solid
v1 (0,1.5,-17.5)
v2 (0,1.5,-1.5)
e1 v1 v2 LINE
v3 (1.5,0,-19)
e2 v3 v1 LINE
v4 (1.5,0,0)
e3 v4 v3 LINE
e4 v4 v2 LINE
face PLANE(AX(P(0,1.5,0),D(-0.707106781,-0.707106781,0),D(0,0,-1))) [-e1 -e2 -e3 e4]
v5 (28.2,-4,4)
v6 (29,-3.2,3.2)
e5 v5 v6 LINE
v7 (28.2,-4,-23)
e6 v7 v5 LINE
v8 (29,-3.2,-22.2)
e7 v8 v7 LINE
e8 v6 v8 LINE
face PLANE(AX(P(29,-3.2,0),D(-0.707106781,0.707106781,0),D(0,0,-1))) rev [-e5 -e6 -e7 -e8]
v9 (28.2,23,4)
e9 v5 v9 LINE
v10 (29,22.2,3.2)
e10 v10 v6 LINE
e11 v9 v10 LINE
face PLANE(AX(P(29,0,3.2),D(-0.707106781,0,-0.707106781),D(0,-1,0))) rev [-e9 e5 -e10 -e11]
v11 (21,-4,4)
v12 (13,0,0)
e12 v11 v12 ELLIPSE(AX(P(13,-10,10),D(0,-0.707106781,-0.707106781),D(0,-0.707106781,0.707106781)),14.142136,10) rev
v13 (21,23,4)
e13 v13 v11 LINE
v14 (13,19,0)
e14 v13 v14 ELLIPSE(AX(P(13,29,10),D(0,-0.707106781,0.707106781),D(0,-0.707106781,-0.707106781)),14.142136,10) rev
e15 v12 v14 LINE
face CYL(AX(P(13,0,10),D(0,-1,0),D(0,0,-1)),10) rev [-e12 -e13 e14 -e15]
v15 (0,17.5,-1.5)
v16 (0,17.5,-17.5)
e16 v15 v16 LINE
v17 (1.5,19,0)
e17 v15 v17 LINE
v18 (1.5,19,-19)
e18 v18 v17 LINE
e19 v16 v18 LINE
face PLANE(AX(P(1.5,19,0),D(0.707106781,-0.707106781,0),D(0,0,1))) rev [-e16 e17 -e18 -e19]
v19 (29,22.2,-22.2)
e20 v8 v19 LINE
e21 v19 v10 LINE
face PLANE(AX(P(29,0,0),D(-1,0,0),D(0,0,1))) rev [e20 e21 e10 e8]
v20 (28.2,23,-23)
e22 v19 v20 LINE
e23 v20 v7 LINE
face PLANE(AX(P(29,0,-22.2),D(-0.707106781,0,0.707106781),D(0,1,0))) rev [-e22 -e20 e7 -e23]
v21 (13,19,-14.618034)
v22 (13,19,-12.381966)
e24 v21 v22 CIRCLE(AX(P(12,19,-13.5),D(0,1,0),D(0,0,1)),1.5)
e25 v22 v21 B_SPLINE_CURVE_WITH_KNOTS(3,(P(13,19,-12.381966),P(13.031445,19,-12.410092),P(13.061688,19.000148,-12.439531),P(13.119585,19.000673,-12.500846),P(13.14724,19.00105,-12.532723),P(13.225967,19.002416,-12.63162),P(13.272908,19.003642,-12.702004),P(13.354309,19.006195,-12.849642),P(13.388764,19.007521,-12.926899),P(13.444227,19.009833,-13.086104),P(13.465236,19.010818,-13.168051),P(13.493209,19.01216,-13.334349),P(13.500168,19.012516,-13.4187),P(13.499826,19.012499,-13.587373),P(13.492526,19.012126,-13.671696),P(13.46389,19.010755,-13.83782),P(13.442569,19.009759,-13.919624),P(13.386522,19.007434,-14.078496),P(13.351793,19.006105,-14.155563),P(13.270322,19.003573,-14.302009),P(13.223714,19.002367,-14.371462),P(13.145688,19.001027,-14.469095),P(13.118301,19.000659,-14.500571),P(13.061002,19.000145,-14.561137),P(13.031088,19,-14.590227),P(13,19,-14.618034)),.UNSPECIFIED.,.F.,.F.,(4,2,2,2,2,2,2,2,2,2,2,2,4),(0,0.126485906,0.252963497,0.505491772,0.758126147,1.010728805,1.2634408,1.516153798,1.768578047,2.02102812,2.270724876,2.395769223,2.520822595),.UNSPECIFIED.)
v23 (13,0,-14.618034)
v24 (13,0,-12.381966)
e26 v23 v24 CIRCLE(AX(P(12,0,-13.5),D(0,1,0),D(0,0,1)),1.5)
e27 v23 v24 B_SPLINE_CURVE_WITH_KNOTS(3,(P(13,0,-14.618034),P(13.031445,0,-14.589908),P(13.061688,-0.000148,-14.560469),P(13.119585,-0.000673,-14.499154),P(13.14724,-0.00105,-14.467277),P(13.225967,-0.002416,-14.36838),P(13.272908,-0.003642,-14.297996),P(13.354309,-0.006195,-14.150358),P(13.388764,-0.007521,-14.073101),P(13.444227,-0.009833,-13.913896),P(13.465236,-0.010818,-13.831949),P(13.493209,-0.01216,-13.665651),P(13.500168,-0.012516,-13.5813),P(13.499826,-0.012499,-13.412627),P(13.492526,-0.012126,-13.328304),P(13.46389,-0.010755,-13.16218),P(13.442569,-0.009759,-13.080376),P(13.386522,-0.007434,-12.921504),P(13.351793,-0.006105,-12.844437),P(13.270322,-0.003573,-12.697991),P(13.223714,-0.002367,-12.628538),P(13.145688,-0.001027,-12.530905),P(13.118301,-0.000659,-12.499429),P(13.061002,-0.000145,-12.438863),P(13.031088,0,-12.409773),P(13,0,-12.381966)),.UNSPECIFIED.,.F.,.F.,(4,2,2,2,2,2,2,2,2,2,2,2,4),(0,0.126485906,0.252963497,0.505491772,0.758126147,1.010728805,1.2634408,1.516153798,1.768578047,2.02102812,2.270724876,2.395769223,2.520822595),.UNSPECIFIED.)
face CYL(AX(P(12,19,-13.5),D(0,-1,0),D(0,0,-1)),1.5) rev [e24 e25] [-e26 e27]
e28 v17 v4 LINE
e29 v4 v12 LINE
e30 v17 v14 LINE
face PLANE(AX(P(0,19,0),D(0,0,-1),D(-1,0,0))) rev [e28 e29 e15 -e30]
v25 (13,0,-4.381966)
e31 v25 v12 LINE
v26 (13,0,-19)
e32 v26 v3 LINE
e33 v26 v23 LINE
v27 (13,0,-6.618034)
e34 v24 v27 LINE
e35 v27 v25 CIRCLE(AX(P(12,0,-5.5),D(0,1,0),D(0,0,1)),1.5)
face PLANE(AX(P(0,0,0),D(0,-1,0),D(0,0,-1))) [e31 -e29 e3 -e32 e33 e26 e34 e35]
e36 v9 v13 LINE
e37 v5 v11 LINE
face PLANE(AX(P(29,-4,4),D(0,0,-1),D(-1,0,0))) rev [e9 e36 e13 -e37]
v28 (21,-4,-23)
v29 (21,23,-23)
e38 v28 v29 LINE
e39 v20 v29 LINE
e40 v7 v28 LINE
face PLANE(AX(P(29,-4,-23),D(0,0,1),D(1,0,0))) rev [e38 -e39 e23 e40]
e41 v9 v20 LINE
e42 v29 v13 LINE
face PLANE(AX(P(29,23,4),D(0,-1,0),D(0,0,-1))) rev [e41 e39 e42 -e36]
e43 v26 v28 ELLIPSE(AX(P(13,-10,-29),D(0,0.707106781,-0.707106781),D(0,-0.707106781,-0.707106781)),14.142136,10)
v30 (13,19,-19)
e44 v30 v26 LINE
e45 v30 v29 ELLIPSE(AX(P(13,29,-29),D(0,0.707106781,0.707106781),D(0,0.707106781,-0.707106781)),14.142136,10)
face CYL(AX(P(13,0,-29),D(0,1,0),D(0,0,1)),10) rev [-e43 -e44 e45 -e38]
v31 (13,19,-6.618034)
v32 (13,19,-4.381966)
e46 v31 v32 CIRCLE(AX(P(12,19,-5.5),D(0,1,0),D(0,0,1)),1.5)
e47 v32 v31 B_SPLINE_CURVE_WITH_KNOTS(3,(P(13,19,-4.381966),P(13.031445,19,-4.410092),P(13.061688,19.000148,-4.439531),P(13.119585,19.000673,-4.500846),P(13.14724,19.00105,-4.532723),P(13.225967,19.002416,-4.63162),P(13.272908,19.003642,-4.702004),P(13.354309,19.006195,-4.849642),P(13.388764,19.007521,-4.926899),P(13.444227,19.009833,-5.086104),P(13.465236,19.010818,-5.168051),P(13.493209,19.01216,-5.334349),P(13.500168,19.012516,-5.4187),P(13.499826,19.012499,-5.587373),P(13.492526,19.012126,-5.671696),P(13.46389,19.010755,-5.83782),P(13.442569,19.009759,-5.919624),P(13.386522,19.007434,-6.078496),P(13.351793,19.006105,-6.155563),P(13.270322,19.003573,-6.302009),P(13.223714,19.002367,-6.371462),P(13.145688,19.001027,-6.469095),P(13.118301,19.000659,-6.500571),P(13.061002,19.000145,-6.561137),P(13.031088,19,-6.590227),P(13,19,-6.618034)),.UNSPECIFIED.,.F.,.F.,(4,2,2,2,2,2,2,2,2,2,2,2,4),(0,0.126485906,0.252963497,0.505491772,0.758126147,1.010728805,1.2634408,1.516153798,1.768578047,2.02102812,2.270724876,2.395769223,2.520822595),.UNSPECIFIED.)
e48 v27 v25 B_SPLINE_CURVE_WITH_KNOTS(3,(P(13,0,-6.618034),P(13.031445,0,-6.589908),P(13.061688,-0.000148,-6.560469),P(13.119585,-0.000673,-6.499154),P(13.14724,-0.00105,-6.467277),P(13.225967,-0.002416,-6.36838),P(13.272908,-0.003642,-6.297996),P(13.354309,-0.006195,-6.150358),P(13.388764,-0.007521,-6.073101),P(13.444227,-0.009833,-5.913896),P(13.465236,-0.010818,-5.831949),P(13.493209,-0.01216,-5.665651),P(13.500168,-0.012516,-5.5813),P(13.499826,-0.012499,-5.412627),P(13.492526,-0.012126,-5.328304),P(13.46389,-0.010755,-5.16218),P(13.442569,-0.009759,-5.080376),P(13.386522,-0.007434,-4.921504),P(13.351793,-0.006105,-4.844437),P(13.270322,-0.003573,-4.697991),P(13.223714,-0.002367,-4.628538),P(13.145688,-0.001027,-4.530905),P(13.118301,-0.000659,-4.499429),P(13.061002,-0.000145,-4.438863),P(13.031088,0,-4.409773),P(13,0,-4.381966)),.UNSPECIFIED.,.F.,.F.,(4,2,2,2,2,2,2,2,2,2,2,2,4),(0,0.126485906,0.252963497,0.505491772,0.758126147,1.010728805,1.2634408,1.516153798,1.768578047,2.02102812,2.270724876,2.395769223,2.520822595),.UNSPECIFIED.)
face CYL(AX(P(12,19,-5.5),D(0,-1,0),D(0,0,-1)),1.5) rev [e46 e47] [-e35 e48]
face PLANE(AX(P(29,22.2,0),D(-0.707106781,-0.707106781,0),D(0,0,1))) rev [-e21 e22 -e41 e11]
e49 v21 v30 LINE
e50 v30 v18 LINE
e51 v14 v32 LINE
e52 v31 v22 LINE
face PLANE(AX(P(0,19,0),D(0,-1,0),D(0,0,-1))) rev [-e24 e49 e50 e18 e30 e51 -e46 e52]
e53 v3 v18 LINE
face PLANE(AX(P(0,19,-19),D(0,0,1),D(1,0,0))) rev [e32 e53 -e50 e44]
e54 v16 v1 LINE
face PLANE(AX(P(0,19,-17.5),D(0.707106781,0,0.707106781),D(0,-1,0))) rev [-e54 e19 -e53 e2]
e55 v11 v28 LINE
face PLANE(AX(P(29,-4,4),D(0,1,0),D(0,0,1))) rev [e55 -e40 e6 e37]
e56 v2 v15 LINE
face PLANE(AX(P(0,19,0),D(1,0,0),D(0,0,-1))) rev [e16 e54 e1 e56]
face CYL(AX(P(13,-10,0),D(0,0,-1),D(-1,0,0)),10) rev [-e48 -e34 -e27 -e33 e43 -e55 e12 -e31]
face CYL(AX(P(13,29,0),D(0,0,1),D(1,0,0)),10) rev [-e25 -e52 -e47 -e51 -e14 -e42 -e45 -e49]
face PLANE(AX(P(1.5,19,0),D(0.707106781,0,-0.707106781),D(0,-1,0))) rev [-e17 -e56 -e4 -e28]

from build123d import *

# Parameters (mm, degrees)
SKETCH1_W           = 21
SKETCH1_H           = 19
SKETCH1_R           = 1.5
BOSS_EXTRUDE1_DEPTH = 19
CHAMFER1_SIZE       = 1.5
SKETCH2_W           = 27
SKETCH2_H           = 27
BOSS_EXTRUDE2_DEPTH = 8
FILLET1_R           = 10
CHAMFER2_SIZE       = 0.8


with BuildPart() as part:
    # Sketch1 → Boss-Extrude1 (new body)
    with BuildSketch(Plane(origin=(0, 0, 0), x_dir=(1, 0, 0), z_dir=(0, 1, 0))):
        with Locations((10.5, 9.5)):
            Rectangle(SKETCH1_W, SKETCH1_H)
        with Locations(Location((12, 13.5, 0), (0, 0, 270))):
            Circle(SKETCH1_R, mode=Mode.SUBTRACT)
        with Locations(Location((12, 5.5, 0), (0, 0, 270))):
            Circle(SKETCH1_R, mode=Mode.SUBTRACT)
    extrude(amount=BOSS_EXTRUDE1_DEPTH)

    # Chamfer1
    chamfer1_edges = [part.edges().sort_by_distance(p)[0] for p in [
        (0, 19, -9.5),
        (0, 0, -9.5),
        (0, 9.5, -19),
        (0, 9.5, 0),
    ]]
    chamfer(chamfer1_edges, length=CHAMFER1_SIZE)

    # Sketch2 → Boss-Extrude2 (add)
    with BuildSketch(Plane(origin=(21, 0, 0), x_dir=(0, 0, -1), z_dir=(1, 0, 0))):
        with Locations((9.5, 9.5)):
            Rectangle(SKETCH2_W, SKETCH2_H)
    extrude(amount=BOSS_EXTRUDE2_DEPTH)

    # Fillet1
    # the kernel refuses this fillet: 10 mm, written as the material it adds along each edge
    with BuildSketch(Plane(origin=(21, 19, 0), x_dir=(0, 1, 0), z_dir=(0, 0, -1))) as fillet1_piece_1_section:
        with BuildLine():
            CenterArc((10, -8), FILLET1_R, 126.869897646, 53.130102354)
            Line((0, -8), (-0.2, -8))
            Line((-0.2, -8), (-0.2, 0))
            Line((-0.2, 0), (0, 0.2))
            ThreePointArc((0, 0.2), (2, 0.2), (3.88, 0.16))
            Line((3.88, 0.16), (4, 0))
        make_face()
    fillet1_piece_1 = extrude(amount=19, mode=Mode.PRIVATE)
    fillet1_piece_1 = fillet1_piece_1 - Plane(origin=(12, 20.025432283, -13.5), x_dir=(0, 0, 1), z_dir=(0, -1, 0)) * Cylinder(1.5, 70, mode=Mode.PRIVATE)
    fillet1_piece_1 = fillet1_piece_1 - Plane(origin=(12, 20.025432283, -5.5), x_dir=(0, 0, 1), z_dir=(0, -1, 0)) * Cylinder(1.5, 70, mode=Mode.PRIVATE)
    add(fillet1_piece_1)
    with BuildSketch(Plane(origin=(21, 0, 0), x_dir=(0, -1, 0), z_dir=(0, 0, -1))) as fillet1_piece_2_section:
        with BuildLine():
            CenterArc((10, 8), FILLET1_R, 180, 53.130102354)
            Line((0, 8), (-0.2, 8))
            Line((-0.2, 8), (-0.2, 0))
            Line((-0.2, 0), (0, -0.2))
            ThreePointArc((0, -0.2), (2, -0.2), (3.88, -0.16))
            Line((3.88, -0.16), (4, 0))
        make_face()
    fillet1_piece_2 = extrude(amount=19, mode=Mode.PRIVATE)
    fillet1_piece_2 = fillet1_piece_2 - Plane(origin=(12, -1.025432283, -13.5), x_dir=(0, 0, 1), z_dir=(0, -1, 0)) * Cylinder(1.5, 70, mode=Mode.PRIVATE)
    fillet1_piece_2 = fillet1_piece_2 - Plane(origin=(12, -1.025432283, -5.5), x_dir=(0, 0, 1), z_dir=(0, -1, 0)) * Cylinder(1.5, 70, mode=Mode.PRIVATE)
    add(fillet1_piece_2)
    with BuildSketch(Plane(origin=(21, 0, -19), x_dir=(0, 0, -1), z_dir=(0, 1, 0))) as fillet1_piece_3:
        with BuildLine():
            CenterArc((10, 8), FILLET1_R, 180, 53.130102354)
            Line((0, 8), (-0.2, 8))
            Line((-0.2, 8), (-0.2, 0))
            Line((-0.2, 0), (0, -0.2))
            ThreePointArc((0, -0.2), (2, -0.2), (3.88, -0.16))
            Line((3.88, -0.16), (4, 0))
        make_face()
    extrude(amount=19)
    with BuildSketch(Plane(origin=(21, 0, 0), x_dir=(0, 0, 1), z_dir=(0, 1, 0))) as fillet1_piece_4:
        with BuildLine():
            CenterArc((10, -8), FILLET1_R, 126.869897646, 53.130102354)
            Line((0, -8), (-0.2, -8))
            Line((-0.2, -8), (-0.2, 0))
            Line((-0.2, 0), (0, 0.2))
            ThreePointArc((0, 0.2), (2, 0.2), (3.88, 0.16))
            Line((3.88, 0.16), (4, 0))
        make_face()
    extrude(amount=19)
    with BuildSketch(Plane(origin=(21, 19, 20), x_dir=(0, 1, 0), z_dir=(0, 0, -1))) as fillet1_piece_5a_section:
        with BuildLine():
            CenterArc((10, -8), FILLET1_R, 126.869897646, 53.130102354)
            Line((0, -8), (-0.2, -8))
            Line((-0.2, -8), (-0.2, 0))
            Line((-0.2, 0), (0, 0.2))
            ThreePointArc((0, 0.2), (2, 0.2), (3.88, 0.16))
            Line((3.88, 0.16), (4, 0))
        make_face()
    fillet1_piece_5a = extrude(amount=39, mode=Mode.PRIVATE)
    fillet1_piece_5a = split(fillet1_piece_5a, bisect_by=Plane(origin=(18.941165886, 20.023885124, 4), z_dir=(0, 0, -1)), keep=Keep.TOP, mode=Mode.PRIVATE)
    fillet1_piece_5a = split(fillet1_piece_5a, bisect_by=Plane(origin=(18.941165886, 20.023885124, 0), z_dir=(0, 0, 1)), keep=Keep.TOP, mode=Mode.PRIVATE)
    with BuildSketch(Plane(origin=(21, 0, 0), x_dir=(0, 0, 1), z_dir=(0, 1, 0))) as fillet1_piece_5b_section:
        with BuildLine():
            CenterArc((10, -8), FILLET1_R, 126.869897646, 53.130102354)
            Line((0, -8), (-0.2, -8))
            Line((-0.2, -8), (-0.2, 0))
            Line((-0.2, 0), (0, 0.2))
            ThreePointArc((0, 0.2), (2, 0.2), (3.88, 0.16))
            Line((3.88, 0.16), (4, 0))
        make_face()
    fillet1_piece_5b = extrude(amount=39, mode=Mode.PRIVATE)
    fillet1_piece_5b = split(fillet1_piece_5b, bisect_by=Plane(origin=(18.941165886, 23, 1.023885124), z_dir=(0, -1, 0)), keep=Keep.TOP, mode=Mode.PRIVATE)
    fillet1_piece_5b = split(fillet1_piece_5b, bisect_by=Plane(origin=(18.941165886, 19, 1.023885124), z_dir=(0, 1, 0)), keep=Keep.TOP, mode=Mode.PRIVATE)
    fillet1_piece_5 = fillet1_piece_5a & fillet1_piece_5b
    add(fillet1_piece_5)
    with BuildSketch(Plane(origin=(21, 0, -19), x_dir=(0, 0, -1), z_dir=(0, 1, 0))) as fillet1_piece_6a_section:
        with BuildLine():
            CenterArc((10, 8), FILLET1_R, 180, 53.130102354)
            Line((0, 8), (-0.2, 8))
            Line((-0.2, 8), (-0.2, 0))
            Line((-0.2, 0), (0, -0.2))
            ThreePointArc((0, -0.2), (2, -0.2), (3.88, -0.16))
            Line((3.88, -0.16), (4, 0))
        make_face()
    fillet1_piece_6a = extrude(amount=39, mode=Mode.PRIVATE)
    fillet1_piece_6a = split(fillet1_piece_6a, bisect_by=Plane(origin=(18.941165886, 23, -20.023885124), z_dir=(0, -1, 0)), keep=Keep.TOP, mode=Mode.PRIVATE)
    fillet1_piece_6a = split(fillet1_piece_6a, bisect_by=Plane(origin=(18.941165886, 19, -20.023885124), z_dir=(0, 1, 0)), keep=Keep.TOP, mode=Mode.PRIVATE)
    with BuildSketch(Plane(origin=(21, 19, 0), x_dir=(0, 1, 0), z_dir=(0, 0, -1))) as fillet1_piece_6b_section:
        with BuildLine():
            CenterArc((10, -8), FILLET1_R, 126.869897646, 53.130102354)
            Line((0, -8), (-0.2, -8))
            Line((-0.2, -8), (-0.2, 0))
            Line((-0.2, 0), (0, 0.2))
            ThreePointArc((0, 0.2), (2, 0.2), (3.88, 0.16))
            Line((3.88, 0.16), (4, 0))
        make_face()
    fillet1_piece_6b = extrude(amount=39, mode=Mode.PRIVATE)
    fillet1_piece_6b = split(fillet1_piece_6b, bisect_by=Plane(origin=(18.941165886, 20.023885124, -23), z_dir=(0, 0, 1)), keep=Keep.TOP, mode=Mode.PRIVATE)
    fillet1_piece_6b = split(fillet1_piece_6b, bisect_by=Plane(origin=(18.941165886, 20.023885124, -19), z_dir=(0, 0, -1)), keep=Keep.TOP, mode=Mode.PRIVATE)
    fillet1_piece_6 = fillet1_piece_6a & fillet1_piece_6b
    add(fillet1_piece_6)
    with BuildSketch(Plane(origin=(21, 0, 20), x_dir=(0, -1, 0), z_dir=(0, 0, -1))) as fillet1_piece_7a_section:
        with BuildLine():
            CenterArc((10, 8), FILLET1_R, 180, 53.130102354)
            Line((0, 8), (-0.2, 8))
            Line((-0.2, 8), (-0.2, 0))
            Line((-0.2, 0), (0, -0.2))
            ThreePointArc((0, -0.2), (2, -0.2), (3.88, -0.16))
            Line((3.88, -0.16), (4, 0))
        make_face()
    fillet1_piece_7a = extrude(amount=39, mode=Mode.PRIVATE)
    fillet1_piece_7a = split(fillet1_piece_7a, bisect_by=Plane(origin=(18.941165886, -1.023885124, 4), z_dir=(0, 0, -1)), keep=Keep.TOP, mode=Mode.PRIVATE)
    fillet1_piece_7a = split(fillet1_piece_7a, bisect_by=Plane(origin=(18.941165886, -1.023885124, 0), z_dir=(0, 0, 1)), keep=Keep.TOP, mode=Mode.PRIVATE)
    with BuildSketch(Plane(origin=(21, -20, 0), x_dir=(0, 0, 1), z_dir=(0, 1, 0))) as fillet1_piece_7b_section:
        with BuildLine():
            CenterArc((10, -8), FILLET1_R, 126.869897646, 53.130102354)
            Line((0, -8), (-0.2, -8))
            Line((-0.2, -8), (-0.2, 0))
            Line((-0.2, 0), (0, 0.2))
            ThreePointArc((0, 0.2), (2, 0.2), (3.88, 0.16))
            Line((3.88, 0.16), (4, 0))
        make_face()
    fillet1_piece_7b = extrude(amount=39, mode=Mode.PRIVATE)
    fillet1_piece_7b = split(fillet1_piece_7b, bisect_by=Plane(origin=(18.941165886, -4, 1.023885124), z_dir=(0, 1, 0)), keep=Keep.TOP, mode=Mode.PRIVATE)
    fillet1_piece_7b = split(fillet1_piece_7b, bisect_by=Plane(origin=(18.941165886, 0, 1.023885124), z_dir=(0, -1, 0)), keep=Keep.TOP, mode=Mode.PRIVATE)
    fillet1_piece_7 = fillet1_piece_7a & fillet1_piece_7b
    add(fillet1_piece_7)
    with BuildSketch(Plane(origin=(21, 0, 0), x_dir=(0, -1, 0), z_dir=(0, 0, -1))) as fillet1_piece_8a_section:
        with BuildLine():
            CenterArc((10, 8), FILLET1_R, 180, 53.130102354)
            Line((0, 8), (-0.2, 8))
            Line((-0.2, 8), (-0.2, 0))
            Line((-0.2, 0), (0, -0.2))
            ThreePointArc((0, -0.2), (2, -0.2), (3.88, -0.16))
            Line((3.88, -0.16), (4, 0))
        make_face()
    fillet1_piece_8a = extrude(amount=39, mode=Mode.PRIVATE)
    fillet1_piece_8a = split(fillet1_piece_8a, bisect_by=Plane(origin=(18.941165886, -1.023885124, -23), z_dir=(0, 0, 1)), keep=Keep.TOP, mode=Mode.PRIVATE)
    fillet1_piece_8a = split(fillet1_piece_8a, bisect_by=Plane(origin=(18.941165886, -1.023885124, -19), z_dir=(0, 0, -1)), keep=Keep.TOP, mode=Mode.PRIVATE)
    with BuildSketch(Plane(origin=(21, -20, -19), x_dir=(0, 0, -1), z_dir=(0, 1, 0))) as fillet1_piece_8b_section:
        with BuildLine():
            CenterArc((10, 8), FILLET1_R, 180, 53.130102354)
            Line((0, 8), (-0.2, 8))
            Line((-0.2, 8), (-0.2, 0))
            Line((-0.2, 0), (0, -0.2))
            ThreePointArc((0, -0.2), (2, -0.2), (3.88, -0.16))
            Line((3.88, -0.16), (4, 0))
        make_face()
    fillet1_piece_8b = extrude(amount=39, mode=Mode.PRIVATE)
    fillet1_piece_8b = split(fillet1_piece_8b, bisect_by=Plane(origin=(18.941165886, -4, -20.023885124), z_dir=(0, 1, 0)), keep=Keep.TOP, mode=Mode.PRIVATE)
    fillet1_piece_8b = split(fillet1_piece_8b, bisect_by=Plane(origin=(18.941165886, 0, -20.023885124), z_dir=(0, -1, 0)), keep=Keep.TOP, mode=Mode.PRIVATE)
    fillet1_piece_8 = fillet1_piece_8a & fillet1_piece_8b
    add(fillet1_piece_8)

    # Chamfer2
    chamfer2_edges = [part.edges().sort_by_distance(p)[0] for p in [
        (29, 9.5, 4),
        (29, -4, -9.5),
        (29, 9.5, -23),
        (29, 23, -9.5),
    ]]
    chamfer(chamfer2_edges, length=CHAMFER2_SIZE)


solid = part.part
